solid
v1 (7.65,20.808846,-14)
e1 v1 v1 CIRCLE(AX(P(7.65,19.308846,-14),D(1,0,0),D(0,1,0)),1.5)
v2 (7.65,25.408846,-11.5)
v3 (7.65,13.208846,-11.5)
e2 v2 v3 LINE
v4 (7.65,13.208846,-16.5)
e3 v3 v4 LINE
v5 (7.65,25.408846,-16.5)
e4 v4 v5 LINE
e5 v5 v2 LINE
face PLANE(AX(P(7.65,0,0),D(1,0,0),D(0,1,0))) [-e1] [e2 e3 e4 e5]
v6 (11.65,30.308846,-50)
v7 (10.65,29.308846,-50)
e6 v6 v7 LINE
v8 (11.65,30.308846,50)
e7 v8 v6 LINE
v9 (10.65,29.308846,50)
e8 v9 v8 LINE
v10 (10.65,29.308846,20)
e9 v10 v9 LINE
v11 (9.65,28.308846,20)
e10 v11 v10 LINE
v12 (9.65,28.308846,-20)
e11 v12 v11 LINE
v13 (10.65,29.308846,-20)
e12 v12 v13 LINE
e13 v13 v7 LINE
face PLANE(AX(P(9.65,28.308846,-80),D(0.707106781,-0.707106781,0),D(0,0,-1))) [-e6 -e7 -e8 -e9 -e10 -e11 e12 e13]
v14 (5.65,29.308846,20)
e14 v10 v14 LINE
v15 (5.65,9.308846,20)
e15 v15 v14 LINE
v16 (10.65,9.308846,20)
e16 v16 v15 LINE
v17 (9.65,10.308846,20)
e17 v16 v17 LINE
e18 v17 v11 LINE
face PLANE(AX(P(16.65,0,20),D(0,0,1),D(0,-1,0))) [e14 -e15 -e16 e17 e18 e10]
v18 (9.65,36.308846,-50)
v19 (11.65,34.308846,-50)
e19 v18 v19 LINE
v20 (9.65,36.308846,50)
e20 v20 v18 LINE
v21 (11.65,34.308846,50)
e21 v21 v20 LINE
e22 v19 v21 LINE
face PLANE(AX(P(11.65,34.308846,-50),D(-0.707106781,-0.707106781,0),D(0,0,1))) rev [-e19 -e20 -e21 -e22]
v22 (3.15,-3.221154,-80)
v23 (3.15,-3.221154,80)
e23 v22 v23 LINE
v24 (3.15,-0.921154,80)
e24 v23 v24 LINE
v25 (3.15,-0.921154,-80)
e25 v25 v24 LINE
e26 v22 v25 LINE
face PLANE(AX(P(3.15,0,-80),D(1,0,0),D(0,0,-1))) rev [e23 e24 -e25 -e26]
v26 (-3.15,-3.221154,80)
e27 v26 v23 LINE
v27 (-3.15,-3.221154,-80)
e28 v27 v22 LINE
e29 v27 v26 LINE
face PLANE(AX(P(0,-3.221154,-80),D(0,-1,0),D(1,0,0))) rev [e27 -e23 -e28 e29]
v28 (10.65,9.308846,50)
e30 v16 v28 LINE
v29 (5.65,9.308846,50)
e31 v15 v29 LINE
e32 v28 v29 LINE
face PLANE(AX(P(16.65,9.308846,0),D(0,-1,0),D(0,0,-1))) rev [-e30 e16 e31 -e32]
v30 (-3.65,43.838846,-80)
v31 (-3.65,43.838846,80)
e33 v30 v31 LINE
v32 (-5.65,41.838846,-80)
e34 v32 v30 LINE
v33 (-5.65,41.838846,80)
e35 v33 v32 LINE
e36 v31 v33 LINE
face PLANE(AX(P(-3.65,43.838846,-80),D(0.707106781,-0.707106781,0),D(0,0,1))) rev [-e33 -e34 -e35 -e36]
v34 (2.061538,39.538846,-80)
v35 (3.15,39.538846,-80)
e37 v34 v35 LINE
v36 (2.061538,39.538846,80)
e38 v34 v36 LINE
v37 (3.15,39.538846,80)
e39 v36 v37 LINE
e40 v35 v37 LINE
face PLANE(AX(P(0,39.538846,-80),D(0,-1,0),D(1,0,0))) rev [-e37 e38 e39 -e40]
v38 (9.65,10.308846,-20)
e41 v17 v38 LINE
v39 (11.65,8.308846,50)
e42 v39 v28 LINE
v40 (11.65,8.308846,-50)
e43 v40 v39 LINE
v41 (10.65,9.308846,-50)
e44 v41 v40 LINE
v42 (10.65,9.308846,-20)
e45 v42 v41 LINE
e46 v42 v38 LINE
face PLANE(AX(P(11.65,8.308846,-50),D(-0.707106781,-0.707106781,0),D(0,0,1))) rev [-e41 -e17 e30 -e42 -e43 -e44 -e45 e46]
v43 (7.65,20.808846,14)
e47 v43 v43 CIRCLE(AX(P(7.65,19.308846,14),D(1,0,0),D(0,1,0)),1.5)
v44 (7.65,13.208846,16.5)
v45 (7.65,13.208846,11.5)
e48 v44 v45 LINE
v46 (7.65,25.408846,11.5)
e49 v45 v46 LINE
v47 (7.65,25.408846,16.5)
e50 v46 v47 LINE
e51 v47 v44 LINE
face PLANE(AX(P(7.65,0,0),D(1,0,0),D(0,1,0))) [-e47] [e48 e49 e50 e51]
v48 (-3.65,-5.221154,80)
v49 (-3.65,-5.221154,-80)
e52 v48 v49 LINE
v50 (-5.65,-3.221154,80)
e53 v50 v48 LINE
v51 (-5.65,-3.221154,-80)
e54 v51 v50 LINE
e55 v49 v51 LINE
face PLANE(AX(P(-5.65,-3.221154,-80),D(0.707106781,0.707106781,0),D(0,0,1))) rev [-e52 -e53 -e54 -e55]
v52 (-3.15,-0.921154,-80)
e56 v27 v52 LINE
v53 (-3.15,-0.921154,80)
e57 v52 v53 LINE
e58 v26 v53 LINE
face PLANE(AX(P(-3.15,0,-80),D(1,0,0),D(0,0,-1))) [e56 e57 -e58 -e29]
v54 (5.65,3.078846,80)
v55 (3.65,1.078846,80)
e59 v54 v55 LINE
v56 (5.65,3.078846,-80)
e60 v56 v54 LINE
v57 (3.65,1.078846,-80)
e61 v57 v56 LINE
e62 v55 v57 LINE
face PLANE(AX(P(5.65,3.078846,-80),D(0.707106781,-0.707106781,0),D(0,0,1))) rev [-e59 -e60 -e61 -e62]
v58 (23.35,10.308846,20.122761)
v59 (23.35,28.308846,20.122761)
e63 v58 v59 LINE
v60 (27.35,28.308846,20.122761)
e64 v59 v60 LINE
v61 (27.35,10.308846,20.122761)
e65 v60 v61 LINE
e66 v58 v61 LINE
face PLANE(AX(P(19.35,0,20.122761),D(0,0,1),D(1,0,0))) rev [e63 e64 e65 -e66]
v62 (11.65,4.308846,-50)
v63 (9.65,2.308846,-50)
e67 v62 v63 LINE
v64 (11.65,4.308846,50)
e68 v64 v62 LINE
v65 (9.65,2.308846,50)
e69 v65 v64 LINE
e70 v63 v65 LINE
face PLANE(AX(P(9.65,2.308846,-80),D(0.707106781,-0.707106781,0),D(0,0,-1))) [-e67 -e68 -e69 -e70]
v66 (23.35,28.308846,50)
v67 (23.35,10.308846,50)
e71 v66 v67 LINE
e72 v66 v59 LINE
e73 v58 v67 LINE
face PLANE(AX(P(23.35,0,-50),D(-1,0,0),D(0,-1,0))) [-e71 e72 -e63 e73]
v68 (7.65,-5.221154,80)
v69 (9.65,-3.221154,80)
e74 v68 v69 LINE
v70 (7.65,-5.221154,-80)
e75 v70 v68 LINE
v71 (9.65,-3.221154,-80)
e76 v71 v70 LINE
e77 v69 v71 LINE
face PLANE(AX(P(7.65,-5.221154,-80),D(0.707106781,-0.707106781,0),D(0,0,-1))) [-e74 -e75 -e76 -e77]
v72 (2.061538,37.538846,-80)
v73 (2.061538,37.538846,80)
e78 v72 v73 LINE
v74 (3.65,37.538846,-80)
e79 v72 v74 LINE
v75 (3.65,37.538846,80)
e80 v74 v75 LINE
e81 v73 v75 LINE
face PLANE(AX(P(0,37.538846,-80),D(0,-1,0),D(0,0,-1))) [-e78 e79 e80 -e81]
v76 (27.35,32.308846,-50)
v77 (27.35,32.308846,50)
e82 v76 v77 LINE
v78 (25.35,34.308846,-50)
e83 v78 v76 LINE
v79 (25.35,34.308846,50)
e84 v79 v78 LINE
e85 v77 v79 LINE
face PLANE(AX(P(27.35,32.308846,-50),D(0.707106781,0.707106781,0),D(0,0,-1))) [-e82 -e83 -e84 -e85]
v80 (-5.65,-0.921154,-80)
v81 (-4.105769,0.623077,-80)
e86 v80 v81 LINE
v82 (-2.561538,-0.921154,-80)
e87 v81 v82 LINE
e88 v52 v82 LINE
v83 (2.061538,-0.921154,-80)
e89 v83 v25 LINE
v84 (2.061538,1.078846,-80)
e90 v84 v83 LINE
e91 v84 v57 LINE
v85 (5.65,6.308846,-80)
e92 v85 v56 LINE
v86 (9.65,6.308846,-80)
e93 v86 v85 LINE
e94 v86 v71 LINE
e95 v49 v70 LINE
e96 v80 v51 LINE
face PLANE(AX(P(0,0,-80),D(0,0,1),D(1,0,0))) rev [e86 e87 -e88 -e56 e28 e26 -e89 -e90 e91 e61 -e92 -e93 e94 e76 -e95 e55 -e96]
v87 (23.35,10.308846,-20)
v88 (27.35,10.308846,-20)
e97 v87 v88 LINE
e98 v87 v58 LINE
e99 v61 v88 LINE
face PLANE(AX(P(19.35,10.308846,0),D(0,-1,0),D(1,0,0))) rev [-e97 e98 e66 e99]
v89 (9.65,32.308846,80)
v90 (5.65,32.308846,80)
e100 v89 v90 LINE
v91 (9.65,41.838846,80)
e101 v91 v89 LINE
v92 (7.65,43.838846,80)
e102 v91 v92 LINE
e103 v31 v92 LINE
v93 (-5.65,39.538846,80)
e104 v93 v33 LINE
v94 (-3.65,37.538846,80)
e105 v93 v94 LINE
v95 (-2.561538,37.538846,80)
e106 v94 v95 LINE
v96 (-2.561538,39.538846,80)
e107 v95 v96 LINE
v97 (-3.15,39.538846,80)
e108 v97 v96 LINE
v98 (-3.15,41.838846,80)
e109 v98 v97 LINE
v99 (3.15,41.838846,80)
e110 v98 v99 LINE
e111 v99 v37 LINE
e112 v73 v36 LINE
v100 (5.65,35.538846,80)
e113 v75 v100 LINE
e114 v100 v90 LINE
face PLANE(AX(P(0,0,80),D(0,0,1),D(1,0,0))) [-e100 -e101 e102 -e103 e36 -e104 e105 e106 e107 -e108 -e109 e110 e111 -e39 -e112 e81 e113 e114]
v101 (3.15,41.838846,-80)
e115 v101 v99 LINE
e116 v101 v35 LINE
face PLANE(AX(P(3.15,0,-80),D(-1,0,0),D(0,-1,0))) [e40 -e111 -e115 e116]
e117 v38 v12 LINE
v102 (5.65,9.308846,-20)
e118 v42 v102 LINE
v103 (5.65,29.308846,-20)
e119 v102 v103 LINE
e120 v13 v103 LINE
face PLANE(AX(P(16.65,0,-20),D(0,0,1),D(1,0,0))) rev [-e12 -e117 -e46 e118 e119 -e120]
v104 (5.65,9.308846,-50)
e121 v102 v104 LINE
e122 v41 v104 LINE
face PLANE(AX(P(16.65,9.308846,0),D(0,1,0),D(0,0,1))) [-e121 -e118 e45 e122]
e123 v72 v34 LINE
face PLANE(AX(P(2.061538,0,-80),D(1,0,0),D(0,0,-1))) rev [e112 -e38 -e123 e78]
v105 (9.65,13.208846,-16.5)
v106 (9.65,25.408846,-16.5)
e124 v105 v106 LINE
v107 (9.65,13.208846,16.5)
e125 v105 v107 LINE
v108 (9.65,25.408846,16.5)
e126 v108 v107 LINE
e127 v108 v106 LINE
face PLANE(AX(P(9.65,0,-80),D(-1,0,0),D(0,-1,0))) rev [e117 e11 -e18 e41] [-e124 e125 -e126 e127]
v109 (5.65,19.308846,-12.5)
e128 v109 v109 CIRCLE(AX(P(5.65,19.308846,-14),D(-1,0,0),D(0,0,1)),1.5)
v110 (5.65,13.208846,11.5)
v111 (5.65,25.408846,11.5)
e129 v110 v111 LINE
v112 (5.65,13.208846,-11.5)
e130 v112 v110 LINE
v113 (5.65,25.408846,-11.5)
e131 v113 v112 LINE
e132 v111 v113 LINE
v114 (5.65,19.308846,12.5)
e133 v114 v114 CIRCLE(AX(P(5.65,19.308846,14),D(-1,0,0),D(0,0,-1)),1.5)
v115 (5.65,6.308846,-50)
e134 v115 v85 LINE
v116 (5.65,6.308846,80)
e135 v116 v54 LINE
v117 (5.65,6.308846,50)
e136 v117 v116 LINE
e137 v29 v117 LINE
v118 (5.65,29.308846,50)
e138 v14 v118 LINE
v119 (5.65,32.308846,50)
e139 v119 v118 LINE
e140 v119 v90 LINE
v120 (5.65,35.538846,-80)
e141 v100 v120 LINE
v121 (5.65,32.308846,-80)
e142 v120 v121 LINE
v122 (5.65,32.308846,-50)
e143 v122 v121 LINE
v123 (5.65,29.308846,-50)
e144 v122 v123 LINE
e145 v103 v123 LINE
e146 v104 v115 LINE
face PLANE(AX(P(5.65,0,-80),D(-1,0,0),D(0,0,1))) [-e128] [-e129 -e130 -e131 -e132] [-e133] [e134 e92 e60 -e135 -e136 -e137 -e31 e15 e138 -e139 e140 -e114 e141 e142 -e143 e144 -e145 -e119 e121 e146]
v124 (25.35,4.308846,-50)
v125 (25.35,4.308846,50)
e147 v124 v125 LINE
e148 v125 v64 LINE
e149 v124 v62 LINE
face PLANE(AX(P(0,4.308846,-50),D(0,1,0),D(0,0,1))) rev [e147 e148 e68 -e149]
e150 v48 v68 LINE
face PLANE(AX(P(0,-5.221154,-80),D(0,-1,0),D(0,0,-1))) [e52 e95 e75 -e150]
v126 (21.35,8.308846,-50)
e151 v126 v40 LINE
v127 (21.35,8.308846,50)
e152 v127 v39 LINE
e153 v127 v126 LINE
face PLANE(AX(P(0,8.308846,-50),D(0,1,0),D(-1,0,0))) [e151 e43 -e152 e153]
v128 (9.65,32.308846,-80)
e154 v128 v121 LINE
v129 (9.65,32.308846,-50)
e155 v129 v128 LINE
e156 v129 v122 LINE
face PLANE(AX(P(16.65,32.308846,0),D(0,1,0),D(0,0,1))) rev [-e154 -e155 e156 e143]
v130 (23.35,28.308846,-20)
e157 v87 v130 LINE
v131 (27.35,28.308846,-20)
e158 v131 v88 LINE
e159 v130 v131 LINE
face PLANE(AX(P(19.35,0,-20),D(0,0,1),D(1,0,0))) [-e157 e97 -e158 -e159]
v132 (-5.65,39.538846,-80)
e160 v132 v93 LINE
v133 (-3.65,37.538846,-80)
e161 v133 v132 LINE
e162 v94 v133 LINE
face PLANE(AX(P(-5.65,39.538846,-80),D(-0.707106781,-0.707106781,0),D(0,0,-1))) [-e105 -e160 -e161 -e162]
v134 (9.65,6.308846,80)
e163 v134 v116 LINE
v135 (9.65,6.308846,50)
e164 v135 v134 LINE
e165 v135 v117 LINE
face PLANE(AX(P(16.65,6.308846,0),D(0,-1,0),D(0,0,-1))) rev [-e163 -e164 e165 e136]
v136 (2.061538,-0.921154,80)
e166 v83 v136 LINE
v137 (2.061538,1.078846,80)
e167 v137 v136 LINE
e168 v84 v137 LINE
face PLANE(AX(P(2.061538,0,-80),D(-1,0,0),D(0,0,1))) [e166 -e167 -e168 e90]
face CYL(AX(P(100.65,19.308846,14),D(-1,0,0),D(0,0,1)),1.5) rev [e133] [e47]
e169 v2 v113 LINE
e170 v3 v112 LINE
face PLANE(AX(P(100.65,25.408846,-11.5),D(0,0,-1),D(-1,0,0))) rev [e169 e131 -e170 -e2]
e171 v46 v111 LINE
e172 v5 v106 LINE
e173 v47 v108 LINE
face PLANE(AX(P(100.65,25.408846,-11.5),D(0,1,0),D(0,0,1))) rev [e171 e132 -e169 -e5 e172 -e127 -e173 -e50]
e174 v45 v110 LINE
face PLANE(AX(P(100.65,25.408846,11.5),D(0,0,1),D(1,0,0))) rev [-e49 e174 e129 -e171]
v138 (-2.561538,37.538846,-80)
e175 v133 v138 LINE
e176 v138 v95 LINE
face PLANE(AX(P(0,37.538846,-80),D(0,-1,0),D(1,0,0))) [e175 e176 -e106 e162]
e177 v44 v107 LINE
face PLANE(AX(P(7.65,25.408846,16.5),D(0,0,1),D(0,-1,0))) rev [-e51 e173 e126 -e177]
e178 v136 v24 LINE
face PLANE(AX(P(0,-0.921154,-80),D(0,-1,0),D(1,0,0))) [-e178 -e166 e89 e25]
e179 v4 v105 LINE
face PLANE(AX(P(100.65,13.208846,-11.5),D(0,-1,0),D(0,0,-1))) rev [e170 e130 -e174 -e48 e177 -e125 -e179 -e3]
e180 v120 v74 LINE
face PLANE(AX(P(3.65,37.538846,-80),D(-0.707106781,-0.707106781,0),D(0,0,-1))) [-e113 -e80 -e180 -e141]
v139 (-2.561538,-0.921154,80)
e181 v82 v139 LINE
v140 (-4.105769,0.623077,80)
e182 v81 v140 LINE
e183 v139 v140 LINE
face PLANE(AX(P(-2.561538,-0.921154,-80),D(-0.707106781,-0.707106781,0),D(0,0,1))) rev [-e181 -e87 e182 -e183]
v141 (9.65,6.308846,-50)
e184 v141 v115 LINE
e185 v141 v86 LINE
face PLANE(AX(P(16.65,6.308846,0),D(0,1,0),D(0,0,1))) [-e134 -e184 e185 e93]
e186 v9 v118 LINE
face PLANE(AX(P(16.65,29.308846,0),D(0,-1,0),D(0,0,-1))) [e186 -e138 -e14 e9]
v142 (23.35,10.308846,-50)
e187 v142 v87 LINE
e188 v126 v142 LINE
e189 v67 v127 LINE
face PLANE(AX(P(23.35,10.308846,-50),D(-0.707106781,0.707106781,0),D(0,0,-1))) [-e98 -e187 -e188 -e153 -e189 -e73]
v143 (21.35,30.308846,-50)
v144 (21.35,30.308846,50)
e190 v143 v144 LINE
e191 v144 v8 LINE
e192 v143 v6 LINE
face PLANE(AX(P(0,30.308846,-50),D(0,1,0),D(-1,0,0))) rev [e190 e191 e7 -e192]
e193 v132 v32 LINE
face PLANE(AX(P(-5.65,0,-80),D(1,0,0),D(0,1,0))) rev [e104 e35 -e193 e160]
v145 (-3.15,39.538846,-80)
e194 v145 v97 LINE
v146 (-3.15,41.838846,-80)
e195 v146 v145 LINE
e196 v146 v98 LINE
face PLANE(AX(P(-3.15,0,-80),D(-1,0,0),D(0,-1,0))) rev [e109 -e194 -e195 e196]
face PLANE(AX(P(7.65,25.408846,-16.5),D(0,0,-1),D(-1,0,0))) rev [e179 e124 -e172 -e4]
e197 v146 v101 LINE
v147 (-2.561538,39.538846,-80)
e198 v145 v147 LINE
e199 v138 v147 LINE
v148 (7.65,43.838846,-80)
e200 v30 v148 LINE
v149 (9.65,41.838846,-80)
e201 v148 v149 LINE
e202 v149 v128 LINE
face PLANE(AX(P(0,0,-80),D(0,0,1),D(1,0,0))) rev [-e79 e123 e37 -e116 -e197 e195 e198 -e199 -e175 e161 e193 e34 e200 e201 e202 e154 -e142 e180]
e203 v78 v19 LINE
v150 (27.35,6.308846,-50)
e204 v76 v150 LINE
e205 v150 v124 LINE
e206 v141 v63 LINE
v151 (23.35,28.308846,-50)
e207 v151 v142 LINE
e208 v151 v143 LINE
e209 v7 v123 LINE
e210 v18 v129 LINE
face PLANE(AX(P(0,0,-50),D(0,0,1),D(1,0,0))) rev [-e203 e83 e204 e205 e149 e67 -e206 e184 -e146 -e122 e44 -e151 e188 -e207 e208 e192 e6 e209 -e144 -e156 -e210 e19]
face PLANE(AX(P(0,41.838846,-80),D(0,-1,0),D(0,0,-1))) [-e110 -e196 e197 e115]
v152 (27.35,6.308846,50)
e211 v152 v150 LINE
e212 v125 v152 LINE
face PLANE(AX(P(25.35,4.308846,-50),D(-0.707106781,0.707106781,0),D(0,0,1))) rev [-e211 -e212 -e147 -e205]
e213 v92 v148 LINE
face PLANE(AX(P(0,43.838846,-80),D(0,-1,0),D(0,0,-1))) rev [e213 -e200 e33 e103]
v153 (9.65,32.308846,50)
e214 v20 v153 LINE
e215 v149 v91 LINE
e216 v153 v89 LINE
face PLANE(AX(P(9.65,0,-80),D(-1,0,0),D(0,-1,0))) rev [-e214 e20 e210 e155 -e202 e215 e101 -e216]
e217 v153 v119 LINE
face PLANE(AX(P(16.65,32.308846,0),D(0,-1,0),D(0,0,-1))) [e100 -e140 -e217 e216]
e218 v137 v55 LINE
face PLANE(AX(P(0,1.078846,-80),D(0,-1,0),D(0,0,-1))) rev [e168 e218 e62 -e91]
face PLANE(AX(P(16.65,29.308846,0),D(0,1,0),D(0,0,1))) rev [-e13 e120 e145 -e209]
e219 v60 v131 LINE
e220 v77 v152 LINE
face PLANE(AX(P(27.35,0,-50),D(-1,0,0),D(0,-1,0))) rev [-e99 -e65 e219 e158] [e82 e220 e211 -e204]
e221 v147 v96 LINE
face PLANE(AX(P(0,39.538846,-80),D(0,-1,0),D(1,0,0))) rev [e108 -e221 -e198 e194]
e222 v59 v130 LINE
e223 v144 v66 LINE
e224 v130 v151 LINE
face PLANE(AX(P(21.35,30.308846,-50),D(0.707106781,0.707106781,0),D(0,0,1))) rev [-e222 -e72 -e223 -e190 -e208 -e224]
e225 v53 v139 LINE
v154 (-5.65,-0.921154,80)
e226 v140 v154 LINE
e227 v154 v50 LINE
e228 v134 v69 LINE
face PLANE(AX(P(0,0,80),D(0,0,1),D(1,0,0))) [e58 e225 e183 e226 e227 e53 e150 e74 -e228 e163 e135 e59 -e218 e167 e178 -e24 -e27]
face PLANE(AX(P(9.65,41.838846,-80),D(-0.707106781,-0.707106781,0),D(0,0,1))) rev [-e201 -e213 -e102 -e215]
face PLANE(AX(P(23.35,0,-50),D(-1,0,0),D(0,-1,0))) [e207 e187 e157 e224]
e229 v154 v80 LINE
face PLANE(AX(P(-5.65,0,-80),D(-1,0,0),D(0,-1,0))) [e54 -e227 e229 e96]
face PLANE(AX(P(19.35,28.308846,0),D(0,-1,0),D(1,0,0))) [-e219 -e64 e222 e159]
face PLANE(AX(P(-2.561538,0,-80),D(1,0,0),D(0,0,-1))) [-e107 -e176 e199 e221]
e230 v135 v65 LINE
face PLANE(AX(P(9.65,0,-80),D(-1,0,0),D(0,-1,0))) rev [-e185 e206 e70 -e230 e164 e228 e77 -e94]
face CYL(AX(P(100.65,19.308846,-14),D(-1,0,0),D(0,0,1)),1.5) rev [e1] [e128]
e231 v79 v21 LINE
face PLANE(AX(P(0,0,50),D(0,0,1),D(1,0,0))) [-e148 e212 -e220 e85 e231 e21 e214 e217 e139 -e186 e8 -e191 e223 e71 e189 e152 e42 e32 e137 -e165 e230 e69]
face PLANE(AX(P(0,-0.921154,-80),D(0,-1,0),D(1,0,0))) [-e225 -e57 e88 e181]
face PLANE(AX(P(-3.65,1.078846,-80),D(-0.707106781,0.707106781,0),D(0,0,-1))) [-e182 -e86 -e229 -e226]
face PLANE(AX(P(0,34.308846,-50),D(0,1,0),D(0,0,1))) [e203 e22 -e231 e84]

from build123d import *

# Parameters (mm, degrees)
BOSS_EXTRU_1_DEPTH      = 80
BOSS_EXTRU_1_DEPTH_BACK = 80
ESQUISSE4_R             = 1.5
ESQUISSE4_W             = 23
ESQUISSE4_H             = 12.2
ENL_V_MAT_EXTRU_1_DEPTH = 95
ENL_V_START             = -2
ESQUISSE5_W             = 5
ESQUISSE5_H             = 12.2
ESQUISSE5_R             = 1.5
ENL_V_MAT_EXTRU_2_DEPTH = 2
BOSS_EXTRU_3_DEPTH      = 50
BOSS_EXTRU_3_DEPTH_BACK = 50
CHANFREIN2_SIZE         = 2
ESQUISSE11_W            = 30
ESQUISSE11_H            = 20
ENL_V_MAT_EXTRU_4_DEPTH = 11
ENL_V_MAT_EXTRU_5_DEPTH = 8


with BuildPart() as part:
    # Esquisse1 → Boss.-Extru.1 (new, two sides: drawn at the far end of the back side and taken through both)
    with BuildSketch(Plane.XY.offset(-BOSS_EXTRU_1_DEPTH_BACK)):
        Polygon((-2.561538462, -0.921153846), (-2.561538462, 1.078846154), (-5.65, 1.078846154), (-5.65, -5.221153846), (5.65, -5.221153846), (9.45, -5.221153846), (9.65, -5.221153846), (9.65, 43.838846154), (9.45, 43.838846154), (5.65, 43.838846154), (-5.65, 43.838846154), (-5.65, 37.538846154), (-2.561538462, 37.538846154), (-2.561538462, 39.538846154), (-3.15, 39.538846154), (-3.15, 41.838846154), (3.15, 41.838846154), (3.15, 39.538846154), (2.061538462, 39.538846154), (2.061538462, 37.538846154), (5.65, 37.538846154), (5.65, 1.078846154), (2.061538462, 1.078846154), (2.061538462, -0.921153846), (3.15, -0.921153846), (3.15, -3.221153846), (-3.15, -3.221153846), (-3.15, -0.921153846), align=None)
    extrude(amount=BOSS_EXTRU_1_DEPTH + BOSS_EXTRU_1_DEPTH_BACK)

    # Esquisse4 → Enlèv. mat.-Extru.1 (cut)
    with BuildSketch(Plane.ZY.offset(-5.65)):
        with Locations((-14, 19.308846154)):
            Circle(ESQUISSE4_R)
        with Locations(Location((14, 19.308846154, 0), (0, 0, 270))):
            Circle(ESQUISSE4_R)
        with Locations((0, 19.308846154)):
            Rectangle(ESQUISSE4_W, ESQUISSE4_H)
    extrude(amount=-ENL_V_MAT_EXTRU_1_DEPTH, mode=Mode.SUBTRACT)

    # Esquisse5 → Enlèv. mat.-Extru.2 (cut)
    # profile 1 of 2: a face of its own
    with BuildSketch(Plane(origin=(9.65, 0, 0), x_dir=(0, 0, -1), z_dir=(1, 0, 0)).offset(ENL_V_START)):
        with Locations((14, 19.308846154)):
            Rectangle(ESQUISSE5_W, ESQUISSE5_H)
        with Locations(Location((14, 19.308846154, 0), (0, 0, 180))):
            Circle(ESQUISSE5_R, mode=Mode.SUBTRACT)
    # profile 2 of 2: a face of its own
    with BuildSketch(Plane(origin=(9.65, 0, 0), x_dir=(0, 0, -1), z_dir=(1, 0, 0)).offset(ENL_V_START)):
        with Locations((-14, 19.308846154)):
            Rectangle(ESQUISSE5_W, ESQUISSE5_H)
        with Locations(Location((-14, 19.308846154, 0), (0, 0, 90))):
            Circle(ESQUISSE5_R, mode=Mode.SUBTRACT)
    extrude(amount=ENL_V_MAT_EXTRU_2_DEPTH, mode=Mode.SUBTRACT)

    # Esquisse9 → Boss.-Extru.3 (add, two sides: drawn at the far end of the back side and taken through both)
    with BuildSketch(Plane.XY.offset(-BOSS_EXTRU_3_DEPTH_BACK)):
        Polygon((23.35, 4.308846154), (27.35, 4.308846154), (27.35, 8.308846154), (27.35, 30.308846154), (27.35, 34.308846154), (9.65, 34.308846154), (9.65, 30.308846154), (23.35, 30.308846154), (23.35, 8.308846154), (9.65, 8.308846154), (9.65, 4.308846154), align=None)
    extrude(amount=BOSS_EXTRU_3_DEPTH + BOSS_EXTRU_3_DEPTH_BACK)

    # Chanfrein2
    # the kernel refuses this chamfer: 2 mm, written as the material it adds along each edge
    with BuildSketch(Plane(origin=(23.35, 8.308846154, 50), x_dir=(-0.9996219169112968, -0.027495876610587375, 0), z_dir=(0, 0, -1)), Plane(origin=(9.65, 4.308846154, -50), x_dir=(-0.027495876610585623, -0.9996219169112968, 0), z_dir=(0, 0, 1))) as chanfrein2_piece_1:
        Polygon((CHANFREIN2_SIZE * 0.999621916911, CHANFREIN2_SIZE * 0.0274958766106), (-CHANFREIN2_SIZE * 0.0274958766106, CHANFREIN2_SIZE * 0.999621916911), (0, 0), align=None)
    extrude(amount=100)
    with BuildSketch(Plane(origin=(23.35, 30.308846154, 50), x_dir=(-0.9996219169112968, 0.027495876610585647, 0), z_dir=(0, 0, -1)), Plane(origin=(9.65, 30.308846154, 50), x_dir=(-0.027495876610588235, -0.9996219169112968, 0), z_dir=(0, 0, -1)), Plane(origin=(9.65, 34.308846154, -50), x_dir=(-0.02749587661058651, 0.9996219169112968, 0), z_dir=(0, 0, 1)), Plane(origin=(9.65, 8.308846154, -50), x_dir=(-0.02749587661058651, 0.9996219169112968, 0), z_dir=(0, 0, 1))) as chanfrein2_piece_2:
        Polygon((CHANFREIN2_SIZE * 0.999621916911, -CHANFREIN2_SIZE * 0.0274958766106), (-CHANFREIN2_SIZE * 0.0274958766106, -CHANFREIN2_SIZE * 0.999621916911), (0, 0), align=None)
    extrude(amount=100)
    with BuildSketch(Plane(origin=(5.65, 37.538846154, -80), x_dir=(-0.9996219169112968, 0.02749587661058563, 0), z_dir=(0, 0, 1)), Plane(origin=(5.65, 1.078846154, -80), x_dir=(0.027495876610586504, 0.9996219169112968, 0), z_dir=(0, 0, 1))) as chanfrein2_piece_3:
        Polygon((CHANFREIN2_SIZE * 0.999621916911, CHANFREIN2_SIZE * 0.0274958766106), (-CHANFREIN2_SIZE * 0.0274958766106, CHANFREIN2_SIZE * 0.999621916911), (0, 0), align=None)
    extrude(amount=160)
    # the kernel refuses this chamfer: 2 mm, written as the material it takes off along each edge
    with BuildSketch(Plane(origin=(-2.561538462, 1.078846154, -85.143365976), x_dir=(-0.9996219169112968, 0.027495876610586716, 0), z_dir=(0, 0, 1)), Plane(origin=(-5.65, 1.078846154, -85.143365976), x_dir=(-0.027495876610586487, -0.9996219169112968, 0), z_dir=(0, 0, 1)), Plane(origin=(-5.65, -5.221153846, -85.143365976), x_dir=(0.9996219169112968, -0.027495876610586494, 0), z_dir=(0, 0, 1)), Plane(origin=(9.65, -5.221153846, -85.143365976), x_dir=(0.027495876610586494, 0.9996219169112968, 0), z_dir=(0, 0, 1)), Plane(origin=(9.65, 43.838846154, -85.143365976), x_dir=(-0.9996219169112968, 0.027495876610585623, 0), z_dir=(0, 0, 1)), Plane(origin=(-5.65, 37.538846154, -85.143365976), x_dir=(0.999621916911297, -0.027495876610582174, 0), z_dir=(0, 0, 1)), Plane(origin=(-5.65, 43.838846154, -85.143365976), x_dir=(-0.02749587661058651, -0.9996219169112968, 0), z_dir=(0, 0, 1))) as chanfrein2_2_piece_1:
        Polygon((CHANFREIN2_SIZE * 0.999621916911, CHANFREIN2_SIZE * 0.0274958766106), (-CHANFREIN2_SIZE * 0.0274958766106, CHANFREIN2_SIZE * 0.999621916911), (0, 0), align=None)
    extrude(amount=170.286731952, mode=Mode.SUBTRACT)
    with BuildSketch(Plane(origin=(27.35, 4.308846154, -55.143365976), x_dir=(0.027495876610585623, 0.9996219169112968, 0), z_dir=(0, 0, 1)), Plane(origin=(27.35, 34.308846154, -55.143365976), x_dir=(-0.9996219169112968, 0.027495876610585647, 0), z_dir=(0, 0, 1))) as chanfrein2_2_piece_2:
        Polygon((CHANFREIN2_SIZE * 0.999621916911, CHANFREIN2_SIZE * 0.0274958766106), (-CHANFREIN2_SIZE * 0.0274958766106, CHANFREIN2_SIZE * 0.999621916911), (0, 0), align=None)
    extrude(amount=110.286731952, mode=Mode.SUBTRACT)

    # Esquisse11 → Enlèv. mat.-Extru.4 (cut)
    with BuildSketch(Plane.ZY.offset(-5.65)):
        Polygon((-50, 29.308846154), (-50, 32.308846154), (-80, 32.308846154), (-80, 6.308846154), (-50, 6.308846154), (-50, 9.308846154), align=None)
        Polygon((80, 32.308846154), (50, 32.308846154), (50, 29.308846154), (50, 9.308846154), (50, 6.308846154), (80, 6.308846154), align=None)
        with Locations((-35, 19.308846154)):
            Rectangle(ESQUISSE11_W, ESQUISSE11_H)
        with Locations((35, 19.308846154)):
            Rectangle(ESQUISSE11_W, ESQUISSE11_H)
    extrude(amount=-ENL_V_MAT_EXTRU_4_DEPTH, mode=Mode.SUBTRACT)

    # Esquisse12 → Enlèv. mat.-Extru.5 (cut)
    with BuildSketch(Plane(origin=(27.35, 0, 0), x_dir=(0, 0, -1), z_dir=(1, 0, 0))):
        Polygon((20, 28.308846154), (10, 28.308846154), (-10, 28.308846154), (-20.122761397, 28.308846154), (-20.122761397, 10.308846154), (-10, 10.308846154), (10, 10.308846154), (20, 10.308846154), align=None)
    extrude(amount=-ENL_V_MAT_EXTRU_5_DEPTH, mode=Mode.SUBTRACT)


solid = part.part
